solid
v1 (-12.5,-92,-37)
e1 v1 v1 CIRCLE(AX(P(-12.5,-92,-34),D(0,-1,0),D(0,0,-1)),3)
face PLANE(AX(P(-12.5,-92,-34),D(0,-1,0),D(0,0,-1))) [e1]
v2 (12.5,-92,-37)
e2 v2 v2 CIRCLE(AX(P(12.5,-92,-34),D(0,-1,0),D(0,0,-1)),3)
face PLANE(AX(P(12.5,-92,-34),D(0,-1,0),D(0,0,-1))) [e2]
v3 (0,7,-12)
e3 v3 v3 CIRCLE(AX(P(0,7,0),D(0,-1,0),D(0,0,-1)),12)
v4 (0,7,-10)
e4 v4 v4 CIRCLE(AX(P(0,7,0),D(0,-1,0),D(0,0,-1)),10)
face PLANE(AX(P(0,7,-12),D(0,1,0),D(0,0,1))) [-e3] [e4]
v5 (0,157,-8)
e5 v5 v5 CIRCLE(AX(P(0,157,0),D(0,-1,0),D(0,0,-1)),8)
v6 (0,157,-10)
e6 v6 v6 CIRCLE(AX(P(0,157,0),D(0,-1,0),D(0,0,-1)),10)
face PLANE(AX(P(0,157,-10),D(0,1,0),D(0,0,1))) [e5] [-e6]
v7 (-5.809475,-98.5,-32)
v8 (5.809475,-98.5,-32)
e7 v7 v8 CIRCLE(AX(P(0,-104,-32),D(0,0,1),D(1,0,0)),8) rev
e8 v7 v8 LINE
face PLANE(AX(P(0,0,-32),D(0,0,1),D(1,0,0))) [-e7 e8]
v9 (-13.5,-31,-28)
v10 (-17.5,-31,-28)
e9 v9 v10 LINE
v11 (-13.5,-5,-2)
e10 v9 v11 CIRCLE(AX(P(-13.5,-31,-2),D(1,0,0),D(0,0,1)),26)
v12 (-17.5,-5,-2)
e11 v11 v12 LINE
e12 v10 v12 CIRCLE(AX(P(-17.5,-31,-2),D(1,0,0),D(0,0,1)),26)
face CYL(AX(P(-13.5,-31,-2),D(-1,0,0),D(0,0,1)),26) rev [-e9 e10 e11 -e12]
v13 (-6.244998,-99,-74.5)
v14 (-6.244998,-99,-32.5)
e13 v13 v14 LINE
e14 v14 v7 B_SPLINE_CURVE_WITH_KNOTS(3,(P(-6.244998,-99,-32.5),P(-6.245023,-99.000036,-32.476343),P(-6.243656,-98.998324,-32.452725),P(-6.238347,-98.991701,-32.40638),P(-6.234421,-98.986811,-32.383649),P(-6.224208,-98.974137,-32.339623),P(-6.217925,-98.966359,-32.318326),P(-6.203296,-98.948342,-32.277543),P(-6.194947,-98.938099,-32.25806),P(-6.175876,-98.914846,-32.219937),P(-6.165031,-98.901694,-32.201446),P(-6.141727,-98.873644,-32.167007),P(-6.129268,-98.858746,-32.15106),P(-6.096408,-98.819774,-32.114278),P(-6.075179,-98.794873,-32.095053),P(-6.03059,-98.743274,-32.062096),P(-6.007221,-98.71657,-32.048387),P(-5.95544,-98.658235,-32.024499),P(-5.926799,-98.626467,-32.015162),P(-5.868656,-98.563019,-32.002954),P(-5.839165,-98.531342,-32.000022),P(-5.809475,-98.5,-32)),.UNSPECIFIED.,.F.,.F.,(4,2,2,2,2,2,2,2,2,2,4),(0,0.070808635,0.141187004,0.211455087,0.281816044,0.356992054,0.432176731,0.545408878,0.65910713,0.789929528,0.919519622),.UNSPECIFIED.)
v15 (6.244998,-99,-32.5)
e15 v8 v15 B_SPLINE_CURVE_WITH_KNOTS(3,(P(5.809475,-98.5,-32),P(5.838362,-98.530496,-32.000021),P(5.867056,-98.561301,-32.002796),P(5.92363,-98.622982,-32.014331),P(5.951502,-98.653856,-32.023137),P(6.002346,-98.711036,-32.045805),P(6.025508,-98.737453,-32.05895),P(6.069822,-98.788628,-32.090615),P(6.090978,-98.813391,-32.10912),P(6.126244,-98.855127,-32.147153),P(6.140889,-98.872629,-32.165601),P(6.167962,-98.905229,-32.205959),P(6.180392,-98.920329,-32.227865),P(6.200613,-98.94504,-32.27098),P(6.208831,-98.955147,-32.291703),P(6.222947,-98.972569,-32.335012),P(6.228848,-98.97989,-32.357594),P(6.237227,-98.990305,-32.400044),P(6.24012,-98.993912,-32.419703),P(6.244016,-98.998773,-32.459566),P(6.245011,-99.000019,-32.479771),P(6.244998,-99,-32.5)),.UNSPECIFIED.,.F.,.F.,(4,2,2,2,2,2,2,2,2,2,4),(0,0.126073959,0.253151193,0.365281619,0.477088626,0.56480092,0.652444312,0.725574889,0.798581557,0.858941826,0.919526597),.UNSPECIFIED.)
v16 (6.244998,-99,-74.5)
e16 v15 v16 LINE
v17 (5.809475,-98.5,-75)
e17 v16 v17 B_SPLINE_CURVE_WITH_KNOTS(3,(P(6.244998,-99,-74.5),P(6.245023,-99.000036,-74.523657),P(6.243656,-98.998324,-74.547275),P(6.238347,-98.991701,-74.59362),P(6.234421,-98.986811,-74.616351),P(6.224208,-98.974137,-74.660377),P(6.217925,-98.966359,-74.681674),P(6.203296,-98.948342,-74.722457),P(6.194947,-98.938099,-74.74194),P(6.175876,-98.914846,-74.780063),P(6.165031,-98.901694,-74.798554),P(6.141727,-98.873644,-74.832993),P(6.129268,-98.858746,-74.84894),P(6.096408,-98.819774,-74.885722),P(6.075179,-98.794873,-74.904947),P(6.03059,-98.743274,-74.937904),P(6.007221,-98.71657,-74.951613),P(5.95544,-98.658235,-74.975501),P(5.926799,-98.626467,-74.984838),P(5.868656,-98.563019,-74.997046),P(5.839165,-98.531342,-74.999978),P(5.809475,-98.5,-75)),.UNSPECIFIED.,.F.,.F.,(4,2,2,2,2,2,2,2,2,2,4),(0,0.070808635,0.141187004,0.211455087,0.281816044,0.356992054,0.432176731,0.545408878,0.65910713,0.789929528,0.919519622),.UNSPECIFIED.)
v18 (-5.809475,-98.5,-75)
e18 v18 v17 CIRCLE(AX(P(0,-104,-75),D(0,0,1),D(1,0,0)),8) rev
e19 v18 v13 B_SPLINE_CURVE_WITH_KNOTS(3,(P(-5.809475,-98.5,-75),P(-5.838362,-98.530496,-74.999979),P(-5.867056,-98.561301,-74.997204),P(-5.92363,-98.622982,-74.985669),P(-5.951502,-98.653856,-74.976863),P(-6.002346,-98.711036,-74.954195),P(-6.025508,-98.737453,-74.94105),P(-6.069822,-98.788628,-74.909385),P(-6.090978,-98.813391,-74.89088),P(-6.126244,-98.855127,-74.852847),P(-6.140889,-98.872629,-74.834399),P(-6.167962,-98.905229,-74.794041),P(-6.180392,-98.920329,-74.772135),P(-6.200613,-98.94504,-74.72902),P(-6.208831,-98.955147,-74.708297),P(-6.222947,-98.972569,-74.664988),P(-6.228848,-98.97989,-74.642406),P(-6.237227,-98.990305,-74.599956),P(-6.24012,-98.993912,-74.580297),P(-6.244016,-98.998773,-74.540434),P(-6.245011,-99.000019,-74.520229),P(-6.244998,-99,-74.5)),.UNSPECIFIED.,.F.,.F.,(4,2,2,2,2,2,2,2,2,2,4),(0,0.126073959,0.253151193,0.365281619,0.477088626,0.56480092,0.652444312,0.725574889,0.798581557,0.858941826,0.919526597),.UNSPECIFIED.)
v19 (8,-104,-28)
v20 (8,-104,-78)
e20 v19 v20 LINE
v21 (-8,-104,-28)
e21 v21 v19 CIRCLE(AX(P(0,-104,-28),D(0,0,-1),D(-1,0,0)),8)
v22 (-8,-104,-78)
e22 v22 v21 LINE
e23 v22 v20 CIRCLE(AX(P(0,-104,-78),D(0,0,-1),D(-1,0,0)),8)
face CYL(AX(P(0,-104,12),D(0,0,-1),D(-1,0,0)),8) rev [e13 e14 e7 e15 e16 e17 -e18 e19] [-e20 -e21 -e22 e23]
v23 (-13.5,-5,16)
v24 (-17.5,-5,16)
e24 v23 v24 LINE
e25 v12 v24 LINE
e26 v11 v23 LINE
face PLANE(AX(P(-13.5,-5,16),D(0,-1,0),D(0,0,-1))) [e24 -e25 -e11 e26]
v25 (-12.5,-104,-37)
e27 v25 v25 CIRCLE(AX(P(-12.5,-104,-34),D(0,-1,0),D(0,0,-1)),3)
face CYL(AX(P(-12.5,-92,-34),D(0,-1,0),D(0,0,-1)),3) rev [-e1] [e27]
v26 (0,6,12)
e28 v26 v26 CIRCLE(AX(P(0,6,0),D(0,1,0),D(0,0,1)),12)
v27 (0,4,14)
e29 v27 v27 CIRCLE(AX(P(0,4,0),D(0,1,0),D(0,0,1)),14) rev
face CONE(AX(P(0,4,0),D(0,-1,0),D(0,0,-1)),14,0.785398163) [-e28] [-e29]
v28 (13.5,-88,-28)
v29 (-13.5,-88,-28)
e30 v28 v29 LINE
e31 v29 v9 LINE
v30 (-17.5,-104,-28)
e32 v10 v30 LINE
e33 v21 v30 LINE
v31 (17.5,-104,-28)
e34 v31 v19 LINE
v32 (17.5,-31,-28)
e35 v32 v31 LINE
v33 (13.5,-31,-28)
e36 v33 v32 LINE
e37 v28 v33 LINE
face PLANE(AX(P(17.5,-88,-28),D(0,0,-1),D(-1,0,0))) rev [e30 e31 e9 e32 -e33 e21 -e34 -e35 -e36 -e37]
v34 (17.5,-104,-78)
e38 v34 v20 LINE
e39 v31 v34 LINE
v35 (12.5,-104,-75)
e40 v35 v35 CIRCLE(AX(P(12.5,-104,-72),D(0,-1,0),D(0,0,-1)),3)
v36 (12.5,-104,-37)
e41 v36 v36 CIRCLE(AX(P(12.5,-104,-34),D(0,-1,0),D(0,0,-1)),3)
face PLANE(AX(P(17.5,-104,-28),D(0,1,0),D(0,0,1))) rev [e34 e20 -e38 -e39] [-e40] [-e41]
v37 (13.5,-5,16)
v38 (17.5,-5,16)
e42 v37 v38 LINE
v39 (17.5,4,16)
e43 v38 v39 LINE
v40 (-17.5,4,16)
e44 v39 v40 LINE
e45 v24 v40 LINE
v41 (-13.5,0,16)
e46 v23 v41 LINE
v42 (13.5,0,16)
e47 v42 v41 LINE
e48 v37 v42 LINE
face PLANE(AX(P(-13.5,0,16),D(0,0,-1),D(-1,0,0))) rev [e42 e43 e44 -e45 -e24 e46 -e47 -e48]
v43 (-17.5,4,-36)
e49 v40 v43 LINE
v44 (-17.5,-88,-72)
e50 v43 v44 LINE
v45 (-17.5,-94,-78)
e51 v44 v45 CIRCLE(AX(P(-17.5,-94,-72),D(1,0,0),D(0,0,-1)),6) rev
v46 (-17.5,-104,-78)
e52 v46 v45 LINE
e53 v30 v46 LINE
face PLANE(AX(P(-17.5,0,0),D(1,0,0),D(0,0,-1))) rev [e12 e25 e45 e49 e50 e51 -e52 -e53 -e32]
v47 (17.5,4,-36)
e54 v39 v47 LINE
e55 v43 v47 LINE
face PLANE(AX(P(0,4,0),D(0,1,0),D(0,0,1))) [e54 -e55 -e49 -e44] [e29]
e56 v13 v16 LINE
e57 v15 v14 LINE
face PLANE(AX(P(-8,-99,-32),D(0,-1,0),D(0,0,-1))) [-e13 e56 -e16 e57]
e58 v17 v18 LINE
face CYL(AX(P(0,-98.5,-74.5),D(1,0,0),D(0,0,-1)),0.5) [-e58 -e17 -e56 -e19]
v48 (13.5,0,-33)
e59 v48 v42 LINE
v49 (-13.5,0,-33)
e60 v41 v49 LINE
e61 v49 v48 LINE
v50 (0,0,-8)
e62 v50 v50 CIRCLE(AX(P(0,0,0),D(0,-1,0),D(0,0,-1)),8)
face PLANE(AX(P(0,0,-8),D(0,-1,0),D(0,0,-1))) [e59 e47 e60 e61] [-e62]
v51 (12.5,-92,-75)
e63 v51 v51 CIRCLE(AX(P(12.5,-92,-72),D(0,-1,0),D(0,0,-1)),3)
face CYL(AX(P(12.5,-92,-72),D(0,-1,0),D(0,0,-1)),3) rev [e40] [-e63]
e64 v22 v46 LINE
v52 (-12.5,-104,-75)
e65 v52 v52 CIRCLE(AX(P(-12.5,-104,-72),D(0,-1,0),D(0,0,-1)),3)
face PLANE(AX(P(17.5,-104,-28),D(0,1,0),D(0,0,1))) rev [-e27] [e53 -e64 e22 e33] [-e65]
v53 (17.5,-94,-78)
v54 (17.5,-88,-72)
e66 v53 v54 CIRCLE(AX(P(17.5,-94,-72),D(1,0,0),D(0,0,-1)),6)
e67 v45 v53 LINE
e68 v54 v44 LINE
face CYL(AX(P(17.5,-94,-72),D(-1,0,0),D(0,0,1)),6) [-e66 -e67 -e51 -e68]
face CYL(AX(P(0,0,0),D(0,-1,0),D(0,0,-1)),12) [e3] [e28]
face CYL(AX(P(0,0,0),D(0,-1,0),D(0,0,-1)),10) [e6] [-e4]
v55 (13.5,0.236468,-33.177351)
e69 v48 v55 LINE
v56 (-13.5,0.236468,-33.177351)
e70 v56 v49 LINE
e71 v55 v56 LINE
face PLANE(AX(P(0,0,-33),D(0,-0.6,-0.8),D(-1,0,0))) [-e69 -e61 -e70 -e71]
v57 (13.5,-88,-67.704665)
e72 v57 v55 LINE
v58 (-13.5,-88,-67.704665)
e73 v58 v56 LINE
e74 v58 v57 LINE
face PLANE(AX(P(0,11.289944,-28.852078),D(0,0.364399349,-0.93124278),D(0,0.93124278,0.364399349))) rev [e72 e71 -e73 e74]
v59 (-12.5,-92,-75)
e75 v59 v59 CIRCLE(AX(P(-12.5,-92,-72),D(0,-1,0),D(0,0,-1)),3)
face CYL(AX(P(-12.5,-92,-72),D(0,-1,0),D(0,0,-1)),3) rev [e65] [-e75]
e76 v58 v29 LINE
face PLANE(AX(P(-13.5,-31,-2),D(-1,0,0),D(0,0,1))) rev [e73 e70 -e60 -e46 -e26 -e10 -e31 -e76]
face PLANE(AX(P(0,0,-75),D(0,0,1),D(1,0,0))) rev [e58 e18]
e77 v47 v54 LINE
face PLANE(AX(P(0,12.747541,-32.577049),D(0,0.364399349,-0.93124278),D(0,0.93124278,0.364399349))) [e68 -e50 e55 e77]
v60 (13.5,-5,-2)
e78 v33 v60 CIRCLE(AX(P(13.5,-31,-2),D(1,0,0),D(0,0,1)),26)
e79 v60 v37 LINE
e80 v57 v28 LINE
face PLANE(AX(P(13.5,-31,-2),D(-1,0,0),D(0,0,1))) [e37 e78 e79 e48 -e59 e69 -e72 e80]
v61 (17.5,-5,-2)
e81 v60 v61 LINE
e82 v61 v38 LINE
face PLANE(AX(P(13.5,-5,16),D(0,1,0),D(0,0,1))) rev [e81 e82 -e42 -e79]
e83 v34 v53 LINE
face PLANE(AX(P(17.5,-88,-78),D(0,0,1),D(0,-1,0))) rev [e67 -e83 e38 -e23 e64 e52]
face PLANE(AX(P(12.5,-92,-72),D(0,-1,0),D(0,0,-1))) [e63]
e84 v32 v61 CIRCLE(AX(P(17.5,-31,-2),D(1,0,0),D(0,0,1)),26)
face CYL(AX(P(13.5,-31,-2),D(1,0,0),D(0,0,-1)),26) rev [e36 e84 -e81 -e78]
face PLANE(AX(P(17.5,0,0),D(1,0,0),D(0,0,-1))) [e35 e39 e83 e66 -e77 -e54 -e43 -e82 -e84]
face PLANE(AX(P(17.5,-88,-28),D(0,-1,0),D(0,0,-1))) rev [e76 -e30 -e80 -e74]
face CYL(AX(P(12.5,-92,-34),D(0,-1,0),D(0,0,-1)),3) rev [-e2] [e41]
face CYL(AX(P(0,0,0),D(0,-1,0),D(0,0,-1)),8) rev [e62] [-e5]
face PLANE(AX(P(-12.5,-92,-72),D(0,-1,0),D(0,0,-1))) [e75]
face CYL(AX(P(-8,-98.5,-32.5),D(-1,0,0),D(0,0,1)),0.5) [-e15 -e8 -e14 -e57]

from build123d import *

# Parameters (mm, degrees)
SKETCH2_W           = 50
SKETCH2_H           = 16
BOSS_EXTRUDE1_DEPTH = 17.5
SKETCH3_R           = 8
CUT_EXTRUDE1_DEPTH  = 182.811028268
BOSS_EXTRUDE2_START = -3
SKETCH4_W           = 16
SKETCH4_H           = 3
BOSS_EXTRUDE2_DEPTH = 43
FILLET1_R           = 0.5
FILLET2_R           = 6
SKETCH6_R           = 3
CUT_EXTRUDE3_DEPTH  = 12
BOSS_EXTRUDE3_DEPTH = 4
BOSS_EXTRUDE5_START = -35
BOSS_EXTRUDE5_DEPTH = 4
SKETCH8_W           = 27
SKETCH8_H           = 52
SKETCH8_R           = 10
BOSS_EXTRUDE6_DEPTH = 4
CHAMFER1_SIZE2      = 4
CHAMFER1_SIZE       = 3
SKETCH9_W           = 27
SKETCH9_H           = 98.792712282
BOSS_EXTRUDE7_DEPTH = 4
CHAMFER2_SIZE       = 2


with BuildPart() as part:
    # Sketch1 → Revolve1 (revolve)
    with BuildSketch(Plane(origin=(0, 0, 0), x_dir=(0, 0, -1), z_dir=(1, 0, 0))):
        Polygon((8, 157), (8, 0), (10, 0), (10, 4), (12, 4), (12, 7), (10, 7), (10, 157), align=None)
    revolve(axis=Axis((0, 0, 0), (0, 1, 0)))



with BuildPart() as body_2:
    # Sketch2 → Boss-Extrude1 (new, symmetric)
    with BuildSketch(Plane(origin=(0, 0, 0), x_dir=(0, 0, -1), z_dir=(1, 0, 0))):
        with Locations((53, -96)):
            Rectangle(SKETCH2_W, SKETCH2_H)
    extrude(amount=BOSS_EXTRUDE1_DEPTH, both=True)

    # Sketch3 → Cut-Extrude1 (cut, through all)
    with BuildSketch(Plane(origin=(0, 0, -78), x_dir=(-1, 0, 0), z_dir=(0, 0, -1))):
        with Locations((0, -104)):
            Circle(SKETCH3_R)
    extrude(amount=-CUT_EXTRUDE1_DEPTH, mode=Mode.SUBTRACT)

    # Sketch4 → Boss-Extrude2 (add)
    with BuildSketch(Plane(origin=(0, 0, -78), x_dir=(-1, 0, 0), z_dir=(0, 0, -1)).offset(BOSS_EXTRUDE2_START)):
        with Locations((0, -97.5)):
            Rectangle(SKETCH4_W, SKETCH4_H)
    extrude(amount=-BOSS_EXTRUDE2_DEPTH)

    # Fillet1
    fillet1_edges = [body_2.edges().sort_by_distance(p)[0] for p in [
        (0, -99, -32),
        (0, -99, -75),
    ]]
    fillet(fillet1_edges, radius=FILLET1_R)

    # Fillet2
    fillet2_edges = [body_2.edges().sort_by_distance(p)[0] for p in [
        (0, -88, -78),
    ]]
    fillet(fillet2_edges, radius=FILLET2_R)

    # Sketch6 → Cut-Extrude3 (cut)
    with BuildSketch(Plane.XZ.offset(104)):
        with Locations(Location((-12.5, -34, 0), (0, 0, 270))):
            Circle(SKETCH6_R)
        with Locations(Location((12.5, -34, 0), (0, 0, 270))):
            Circle(SKETCH6_R)
        with Locations(Location((-12.5, -72, 0), (0, 0, 270))):
            Circle(SKETCH6_R)
        with Locations(Location((12.5, -72, 0), (0, 0, 270))):
            Circle(SKETCH6_R)
    extrude(amount=-CUT_EXTRUDE3_DEPTH, mode=Mode.SUBTRACT)


with BuildPart() as body_3:
    # Sketch7 → Boss-Extrude3 (new body)
    with BuildSketch(Plane.ZY.offset(17.5)):
        with BuildLine():
            Line((-72, -88), (-36, 4))
            Line((-36, 4), (16, 4))
            Line((16, 4), (16, -5))
            Line((16, -5), (-2, -5))
            ThreePointArc((-2, -5), (-20.384776311, -12.615223689), (-28, -31))
            Line((-28, -31), (-28, -88))
            Line((-28, -88), (-72, -88))
        make_face()
    extrude(amount=-BOSS_EXTRUDE3_DEPTH)


with BuildPart() as body_4:
    # Sketch7<2> → Boss-Extrude5 (new body)
    with BuildSketch(Plane.ZY.offset(17.5).offset(BOSS_EXTRUDE5_START)):
        with BuildLine():
            Line((-72, -88), (-36, 4))
            Line((-36, 4), (16, 4))
            Line((16, 4), (16, -5))
            Line((16, -5), (-2, -5))
            ThreePointArc((-2, -5), (-20.384776311, -12.615223689), (-28, -31))
            Line((-28, -31), (-28, -88))
            Line((-28, -88), (-72, -88))
        make_face()
    extrude(amount=BOSS_EXTRUDE5_DEPTH)


with BuildPart() as part_1:
    add(part.part)

    add(body_3.part)  # Boss-Extrude6 merges body 3

    add(body_4.part)  # Boss-Extrude6 merges body 4
    # Sketch8 → Boss-Extrude6 (add)
    with BuildSketch(Plane.XZ.offset(-4)):
        with Locations((0, -10)):
            Rectangle(SKETCH8_W, SKETCH8_H)
        with Locations(Location((0, 0, 0), (0, 0, 270))):
            Circle(SKETCH8_R, mode=Mode.SUBTRACT)
    extrude(amount=BOSS_EXTRUDE6_DEPTH)

    # Chamfer1
    chamfer1_edges = [part_1.edges().sort_by_distance(p)[0] for p in [
        (0, 0, -36),
    ]]
    chamfer1_side = [part_1.faces().sort_by_distance(p)[0] for p in [
        (0, 0, -35.94),
    ]]
    chamfer(chamfer1_edges, length=CHAMFER1_SIZE - 0.0001, length2=CHAMFER1_SIZE2 - 0.0001, reference=chamfer1_side[0])  # a hair under: the kernel refuses the full size


    add(body_2.part)  # Boss-Extrude7 merges body 2
    # Sketch9 → Boss-Extrude7 (add)
    with BuildSketch(Plane(origin=(0, 12.747540984, -32.57704918), x_dir=(-1, 0, 0), z_dir=(0, 0.3643993485805124, -0.9312427797057534))):
        with Locations((0, -58.789761571)):
            Rectangle(SKETCH9_W, SKETCH9_H)
    extrude(amount=-BOSS_EXTRUDE7_DEPTH)

    # Chamfer2
    chamfer2_edges = [part_1.edges().sort_by_distance(p)[0] for p in [
        (0, 4, 12),
    ]]
    chamfer(chamfer2_edges, length=CHAMFER2_SIZE)


solid = part_1.part
